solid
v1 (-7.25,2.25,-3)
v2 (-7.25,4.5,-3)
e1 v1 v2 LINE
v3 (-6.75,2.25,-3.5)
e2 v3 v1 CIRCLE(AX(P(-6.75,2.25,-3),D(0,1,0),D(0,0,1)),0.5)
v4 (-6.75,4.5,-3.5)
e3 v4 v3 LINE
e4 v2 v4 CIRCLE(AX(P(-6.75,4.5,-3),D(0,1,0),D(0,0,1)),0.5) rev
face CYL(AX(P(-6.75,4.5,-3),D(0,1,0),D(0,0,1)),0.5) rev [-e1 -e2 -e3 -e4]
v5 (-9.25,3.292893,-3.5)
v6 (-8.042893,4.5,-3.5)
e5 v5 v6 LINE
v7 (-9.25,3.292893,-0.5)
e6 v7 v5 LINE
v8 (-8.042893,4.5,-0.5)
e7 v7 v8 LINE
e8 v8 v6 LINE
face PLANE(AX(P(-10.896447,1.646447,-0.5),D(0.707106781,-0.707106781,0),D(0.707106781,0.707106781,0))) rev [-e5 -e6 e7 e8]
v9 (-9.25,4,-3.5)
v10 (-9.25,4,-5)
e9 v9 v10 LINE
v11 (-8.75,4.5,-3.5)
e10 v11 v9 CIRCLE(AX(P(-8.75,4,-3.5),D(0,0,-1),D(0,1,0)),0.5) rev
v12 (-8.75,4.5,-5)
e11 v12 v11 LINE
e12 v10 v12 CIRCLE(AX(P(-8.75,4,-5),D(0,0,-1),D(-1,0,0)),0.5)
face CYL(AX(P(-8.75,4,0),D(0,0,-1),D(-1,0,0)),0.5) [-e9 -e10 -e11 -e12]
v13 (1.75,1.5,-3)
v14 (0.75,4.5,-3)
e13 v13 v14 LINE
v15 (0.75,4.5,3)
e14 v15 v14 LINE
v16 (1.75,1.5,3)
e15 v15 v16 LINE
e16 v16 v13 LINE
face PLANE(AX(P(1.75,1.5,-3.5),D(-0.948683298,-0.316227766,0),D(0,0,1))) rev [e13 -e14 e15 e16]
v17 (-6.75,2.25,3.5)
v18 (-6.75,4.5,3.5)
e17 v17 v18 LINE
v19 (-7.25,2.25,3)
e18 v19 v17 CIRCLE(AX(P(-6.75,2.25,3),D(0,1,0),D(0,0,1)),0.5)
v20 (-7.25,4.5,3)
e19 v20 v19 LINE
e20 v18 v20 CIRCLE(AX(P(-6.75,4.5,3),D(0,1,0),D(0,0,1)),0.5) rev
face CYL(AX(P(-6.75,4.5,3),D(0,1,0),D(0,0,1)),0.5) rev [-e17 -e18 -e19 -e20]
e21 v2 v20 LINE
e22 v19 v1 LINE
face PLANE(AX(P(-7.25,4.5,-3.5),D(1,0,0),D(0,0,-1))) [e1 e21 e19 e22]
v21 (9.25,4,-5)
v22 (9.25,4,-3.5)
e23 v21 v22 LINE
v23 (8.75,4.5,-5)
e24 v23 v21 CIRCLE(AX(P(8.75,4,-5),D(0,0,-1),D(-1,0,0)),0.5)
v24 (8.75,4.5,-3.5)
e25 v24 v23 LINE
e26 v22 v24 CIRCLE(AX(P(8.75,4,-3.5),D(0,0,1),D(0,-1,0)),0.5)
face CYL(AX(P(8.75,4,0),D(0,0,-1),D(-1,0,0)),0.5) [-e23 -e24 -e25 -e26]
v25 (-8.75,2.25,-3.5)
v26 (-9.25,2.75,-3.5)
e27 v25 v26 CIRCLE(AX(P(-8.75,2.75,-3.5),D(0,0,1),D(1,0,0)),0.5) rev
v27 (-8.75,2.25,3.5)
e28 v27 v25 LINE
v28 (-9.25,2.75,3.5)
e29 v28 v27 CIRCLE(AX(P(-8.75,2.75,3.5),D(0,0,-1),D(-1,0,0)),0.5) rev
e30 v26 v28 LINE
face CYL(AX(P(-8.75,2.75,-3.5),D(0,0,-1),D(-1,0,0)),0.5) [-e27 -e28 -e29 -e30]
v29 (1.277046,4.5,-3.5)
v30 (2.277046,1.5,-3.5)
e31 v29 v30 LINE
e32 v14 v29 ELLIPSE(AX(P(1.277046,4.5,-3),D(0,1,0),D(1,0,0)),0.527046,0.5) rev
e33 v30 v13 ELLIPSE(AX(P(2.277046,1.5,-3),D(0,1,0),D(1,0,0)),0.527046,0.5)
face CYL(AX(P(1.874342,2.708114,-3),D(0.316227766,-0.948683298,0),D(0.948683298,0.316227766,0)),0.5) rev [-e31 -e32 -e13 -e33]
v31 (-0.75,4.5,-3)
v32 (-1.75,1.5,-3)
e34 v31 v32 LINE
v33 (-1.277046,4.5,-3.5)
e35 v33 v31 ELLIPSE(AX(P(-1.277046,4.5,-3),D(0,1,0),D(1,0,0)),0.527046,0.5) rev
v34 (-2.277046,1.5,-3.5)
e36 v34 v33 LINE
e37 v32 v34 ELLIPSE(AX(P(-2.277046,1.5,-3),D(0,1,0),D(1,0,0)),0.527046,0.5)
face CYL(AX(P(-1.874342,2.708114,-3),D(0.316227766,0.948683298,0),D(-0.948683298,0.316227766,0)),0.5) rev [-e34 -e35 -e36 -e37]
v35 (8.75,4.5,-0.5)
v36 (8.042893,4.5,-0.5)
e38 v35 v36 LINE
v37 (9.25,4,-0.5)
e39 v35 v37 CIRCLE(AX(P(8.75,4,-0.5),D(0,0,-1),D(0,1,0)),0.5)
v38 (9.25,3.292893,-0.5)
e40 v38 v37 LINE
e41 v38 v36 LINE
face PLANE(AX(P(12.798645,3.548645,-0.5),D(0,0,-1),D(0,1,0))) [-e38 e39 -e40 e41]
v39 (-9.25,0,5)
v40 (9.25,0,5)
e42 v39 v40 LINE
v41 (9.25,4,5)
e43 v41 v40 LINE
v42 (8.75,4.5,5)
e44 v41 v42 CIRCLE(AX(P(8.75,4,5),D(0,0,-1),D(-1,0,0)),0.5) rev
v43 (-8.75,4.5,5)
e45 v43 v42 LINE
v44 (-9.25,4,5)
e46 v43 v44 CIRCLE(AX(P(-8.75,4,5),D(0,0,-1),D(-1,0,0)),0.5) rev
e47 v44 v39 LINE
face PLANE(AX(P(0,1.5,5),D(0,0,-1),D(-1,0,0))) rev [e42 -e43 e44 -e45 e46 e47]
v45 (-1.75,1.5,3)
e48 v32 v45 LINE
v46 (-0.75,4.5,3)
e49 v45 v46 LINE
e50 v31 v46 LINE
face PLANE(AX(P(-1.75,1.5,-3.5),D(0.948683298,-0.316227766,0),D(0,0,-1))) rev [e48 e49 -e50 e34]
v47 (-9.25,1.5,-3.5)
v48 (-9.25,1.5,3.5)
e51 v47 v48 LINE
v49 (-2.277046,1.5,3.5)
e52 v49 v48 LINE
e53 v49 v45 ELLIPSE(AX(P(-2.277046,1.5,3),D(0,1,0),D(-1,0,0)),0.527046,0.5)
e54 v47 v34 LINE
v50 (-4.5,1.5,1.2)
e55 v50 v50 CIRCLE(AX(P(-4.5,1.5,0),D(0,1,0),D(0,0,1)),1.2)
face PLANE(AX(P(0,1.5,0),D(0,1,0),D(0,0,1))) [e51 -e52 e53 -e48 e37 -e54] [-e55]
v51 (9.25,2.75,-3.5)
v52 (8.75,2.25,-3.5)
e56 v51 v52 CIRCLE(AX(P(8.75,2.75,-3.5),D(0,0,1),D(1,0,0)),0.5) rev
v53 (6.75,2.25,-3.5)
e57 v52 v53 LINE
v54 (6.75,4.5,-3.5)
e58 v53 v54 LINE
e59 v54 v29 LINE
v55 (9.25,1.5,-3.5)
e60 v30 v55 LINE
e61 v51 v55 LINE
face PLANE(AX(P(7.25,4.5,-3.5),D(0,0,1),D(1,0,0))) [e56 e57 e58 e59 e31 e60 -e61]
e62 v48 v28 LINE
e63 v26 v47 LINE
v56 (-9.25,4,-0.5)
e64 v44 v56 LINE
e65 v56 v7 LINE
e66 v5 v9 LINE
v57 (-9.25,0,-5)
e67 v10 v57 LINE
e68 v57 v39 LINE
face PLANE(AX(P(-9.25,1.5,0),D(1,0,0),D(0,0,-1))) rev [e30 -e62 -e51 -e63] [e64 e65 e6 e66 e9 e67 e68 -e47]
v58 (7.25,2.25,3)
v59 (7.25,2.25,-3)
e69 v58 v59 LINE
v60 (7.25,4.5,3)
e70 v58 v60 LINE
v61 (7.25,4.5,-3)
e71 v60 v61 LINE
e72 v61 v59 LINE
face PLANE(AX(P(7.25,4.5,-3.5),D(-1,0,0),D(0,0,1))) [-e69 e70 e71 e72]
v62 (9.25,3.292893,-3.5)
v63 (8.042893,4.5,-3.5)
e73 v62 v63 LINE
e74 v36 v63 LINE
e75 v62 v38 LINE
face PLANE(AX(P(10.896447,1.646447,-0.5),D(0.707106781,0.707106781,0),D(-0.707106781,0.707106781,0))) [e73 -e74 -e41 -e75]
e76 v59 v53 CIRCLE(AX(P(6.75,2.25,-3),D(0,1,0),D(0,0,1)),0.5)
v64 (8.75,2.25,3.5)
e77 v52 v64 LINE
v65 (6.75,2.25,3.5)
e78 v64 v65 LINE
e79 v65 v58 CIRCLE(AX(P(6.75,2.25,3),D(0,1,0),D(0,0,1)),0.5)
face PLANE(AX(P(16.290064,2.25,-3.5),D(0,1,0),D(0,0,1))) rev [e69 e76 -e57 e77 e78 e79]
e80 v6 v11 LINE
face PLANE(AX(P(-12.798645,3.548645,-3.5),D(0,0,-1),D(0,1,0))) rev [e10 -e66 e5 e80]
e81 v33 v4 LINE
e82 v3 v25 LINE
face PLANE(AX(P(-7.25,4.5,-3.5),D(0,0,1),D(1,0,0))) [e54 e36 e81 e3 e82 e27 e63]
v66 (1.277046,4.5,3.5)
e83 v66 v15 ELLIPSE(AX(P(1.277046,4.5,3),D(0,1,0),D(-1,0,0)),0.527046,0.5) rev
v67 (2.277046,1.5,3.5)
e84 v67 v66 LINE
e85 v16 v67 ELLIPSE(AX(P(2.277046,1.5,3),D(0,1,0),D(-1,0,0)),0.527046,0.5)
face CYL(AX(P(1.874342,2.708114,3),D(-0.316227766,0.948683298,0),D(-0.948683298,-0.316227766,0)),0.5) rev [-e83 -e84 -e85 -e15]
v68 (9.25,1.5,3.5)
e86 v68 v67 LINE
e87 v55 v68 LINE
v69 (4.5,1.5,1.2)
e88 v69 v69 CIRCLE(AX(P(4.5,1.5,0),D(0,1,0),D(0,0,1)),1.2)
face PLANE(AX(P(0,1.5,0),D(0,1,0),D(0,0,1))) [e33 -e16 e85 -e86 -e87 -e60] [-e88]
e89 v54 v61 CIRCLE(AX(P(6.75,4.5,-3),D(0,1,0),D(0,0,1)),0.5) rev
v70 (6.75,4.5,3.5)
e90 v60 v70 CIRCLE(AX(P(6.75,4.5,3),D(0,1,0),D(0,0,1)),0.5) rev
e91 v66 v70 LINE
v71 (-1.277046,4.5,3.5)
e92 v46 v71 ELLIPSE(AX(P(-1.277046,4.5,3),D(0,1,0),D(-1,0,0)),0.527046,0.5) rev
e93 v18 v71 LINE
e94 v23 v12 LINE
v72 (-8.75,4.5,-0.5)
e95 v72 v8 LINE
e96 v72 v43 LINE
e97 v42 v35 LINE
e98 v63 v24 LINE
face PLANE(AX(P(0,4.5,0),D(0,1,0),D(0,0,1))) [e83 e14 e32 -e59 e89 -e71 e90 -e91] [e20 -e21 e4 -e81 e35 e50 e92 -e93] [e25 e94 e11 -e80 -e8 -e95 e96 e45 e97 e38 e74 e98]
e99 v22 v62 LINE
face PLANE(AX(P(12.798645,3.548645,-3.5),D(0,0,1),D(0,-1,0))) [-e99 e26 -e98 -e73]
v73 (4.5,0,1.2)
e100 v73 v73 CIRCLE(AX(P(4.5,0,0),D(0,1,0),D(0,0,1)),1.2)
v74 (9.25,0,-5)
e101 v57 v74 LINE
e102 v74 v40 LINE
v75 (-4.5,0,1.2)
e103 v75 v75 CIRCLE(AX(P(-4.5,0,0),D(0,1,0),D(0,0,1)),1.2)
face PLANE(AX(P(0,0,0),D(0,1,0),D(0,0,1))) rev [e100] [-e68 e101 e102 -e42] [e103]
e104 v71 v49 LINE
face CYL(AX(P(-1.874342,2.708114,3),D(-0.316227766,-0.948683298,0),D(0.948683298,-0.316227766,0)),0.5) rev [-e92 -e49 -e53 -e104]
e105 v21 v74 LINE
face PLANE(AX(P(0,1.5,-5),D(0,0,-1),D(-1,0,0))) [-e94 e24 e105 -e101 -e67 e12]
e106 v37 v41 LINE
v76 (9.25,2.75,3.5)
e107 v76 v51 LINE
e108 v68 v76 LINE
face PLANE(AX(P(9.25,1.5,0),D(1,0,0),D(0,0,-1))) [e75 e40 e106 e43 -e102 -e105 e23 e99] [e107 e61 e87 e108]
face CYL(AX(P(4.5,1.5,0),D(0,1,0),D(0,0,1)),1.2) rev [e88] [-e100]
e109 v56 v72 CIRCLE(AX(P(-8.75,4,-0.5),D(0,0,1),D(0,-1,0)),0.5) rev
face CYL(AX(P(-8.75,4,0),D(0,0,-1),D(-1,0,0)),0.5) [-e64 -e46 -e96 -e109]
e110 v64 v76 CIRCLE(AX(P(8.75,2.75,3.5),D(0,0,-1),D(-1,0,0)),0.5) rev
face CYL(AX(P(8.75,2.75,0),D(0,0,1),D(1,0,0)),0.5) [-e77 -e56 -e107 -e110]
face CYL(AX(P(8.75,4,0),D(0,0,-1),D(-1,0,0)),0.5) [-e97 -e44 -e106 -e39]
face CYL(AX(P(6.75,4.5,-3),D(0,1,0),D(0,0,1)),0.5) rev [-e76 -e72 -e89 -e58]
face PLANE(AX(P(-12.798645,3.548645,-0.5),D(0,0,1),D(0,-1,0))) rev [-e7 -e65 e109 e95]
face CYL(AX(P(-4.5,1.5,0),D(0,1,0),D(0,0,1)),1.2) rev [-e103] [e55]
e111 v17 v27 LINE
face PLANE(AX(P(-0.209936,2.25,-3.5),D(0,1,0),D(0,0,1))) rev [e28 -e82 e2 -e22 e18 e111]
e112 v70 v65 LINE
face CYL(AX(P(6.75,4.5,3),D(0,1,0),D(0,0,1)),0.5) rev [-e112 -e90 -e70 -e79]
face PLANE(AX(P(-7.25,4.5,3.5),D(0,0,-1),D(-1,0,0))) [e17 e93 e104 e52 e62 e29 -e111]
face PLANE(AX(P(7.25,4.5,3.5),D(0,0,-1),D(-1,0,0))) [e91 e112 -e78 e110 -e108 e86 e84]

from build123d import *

# Parameters (mm, degrees)
SKETCH1_W           = 18.5
SKETCH1_H           = 10
SKETCH1_W_2         = 5.5
SKETCH1_H_2         = 7
BOSS_EXTRUDE1_DEPTH = 1.5
SKETCH1_3_W         = 18.5
SKETCH1_3_H         = 10
SKETCH1_3_W_2       = 5.5
SKETCH1_3_H_2       = 7
BOSS_EXTRUDE2_DEPTH = 4.5
CUT_EXTRUDE1_START  = -2
SKETCH2_W           = 7
SKETCH2_H           = 0.75
CUT_EXTRUDE1_DEPTH  = 2
CUT_EXTRUDE5_START  = -16.5
SKETCH2_2_W         = 7
SKETCH2_2_H         = 0.75
CUT_EXTRUDE5_DEPTH  = 2
SKETCH4_W           = 3
SKETCH4_H           = 2.690114405
CUT_EXTRUDE3_DEPTH  = 12.437329234
CHAMFER1_SIZE       = 1
CHAMFER1_SIZE_2     = 3
FILLET2_R           = 0.5


with BuildPart() as part:
    # Sketch1 → Boss-Extrude1 (new body)
    # profile 1 of 3: a face of its own
    with BuildSketch(Plane(origin=(0, 0, 0), x_dir=(1, 0, 0), z_dir=(0, 1, 0))):
        Rectangle(SKETCH1_W, SKETCH1_H)
        with Locations((4.5, 0)):
            Rectangle(SKETCH1_W_2, SKETCH1_H_2, mode=Mode.SUBTRACT)
        with Locations((-4.5, 0)):
            Rectangle(SKETCH1_W_2, SKETCH1_H_2, mode=Mode.SUBTRACT)
    # profile 2 of 3: a face of its own
    with BuildSketch(Plane(origin=(0, 0, 0), x_dir=(1, 0, 0), z_dir=(0, 1, 0))):
        with Locations((4.5, 0)):
            Rectangle(SKETCH1_W_2, SKETCH1_H_2)
    # profile 3 of 3: a face of its own
    with BuildSketch(Plane(origin=(0, 0, 0), x_dir=(1, 0, 0), z_dir=(0, 1, 0))):
        with Locations((-4.5, 0)):
            Rectangle(SKETCH1_W_2, SKETCH1_H_2)
    extrude(amount=BOSS_EXTRUDE1_DEPTH)

    # Sketch1<3> → Boss-Extrude2 (add)
    with BuildSketch(Plane(origin=(0, 0, 0), x_dir=(1, 0, 0), z_dir=(0, 1, 0))):
        Rectangle(SKETCH1_3_W, SKETCH1_3_H)
        with Locations((-4.5, 0)):
            Rectangle(SKETCH1_3_W_2, SKETCH1_3_H_2, mode=Mode.SUBTRACT)
        with Locations((4.5, 0)):
            Rectangle(SKETCH1_3_W_2, SKETCH1_3_H_2, mode=Mode.SUBTRACT)
    extrude(amount=BOSS_EXTRUDE2_DEPTH)

    # Sketch2 → Cut-Extrude1 (cut)
    with BuildSketch(Plane.ZY.offset(9.25).offset(CUT_EXTRUDE1_START)):
        with Locations((0, 1.875)):
            Rectangle(SKETCH2_W, SKETCH2_H)
    extrude(amount=CUT_EXTRUDE1_DEPTH, mode=Mode.SUBTRACT)

    # Sketch2<2> → Cut-Extrude5 (cut)
    with BuildSketch(Plane.ZY.offset(9.25).offset(CUT_EXTRUDE5_START)):
        with Locations((0, 1.875)):
            Rectangle(SKETCH2_2_W, SKETCH2_2_H)
    extrude(amount=-CUT_EXTRUDE5_DEPTH, mode=Mode.SUBTRACT)

    # Sketch4 → Cut-Extrude3 (cut, symmetric)
    with BuildSketch(Plane(origin=(0, 0, 0), x_dir=(0, 0, 1), z_dir=(0.7071067811865488, 0.7071067811865464, 0))):
        with Locations((-2, -10.214222054)):
            Rectangle(SKETCH4_W, SKETCH4_H)
    cut_extrude3 = extrude(amount=CUT_EXTRUDE3_DEPTH, both=True, mode=Mode.SUBTRACT)

    # Sketch5 → M2 Clearance Hole1 (revolve, cut)
    with BuildSketch(Plane(origin=(-4.5, 1.5, 0), x_dir=(0, 0, 1), z_dir=(1, 0, 0))):
        Polygon((0, 0), (0, 2.321032743), (1.2, 1.6), (1.2, 0), align=None)
    m2_clearance_hole1 = revolve(axis=Axis((-4.5, 7.85, 0), (0, -1, 0)), mode=Mode.SUBTRACT)

    # Mirror4: Cut-Extrude3, M2 Clearance Hole1 across plane
    add(cut_extrude3.mirror(Plane(origin=(0, 0, 0), x_dir=(0, 0, 1), z_dir=(1, 0, 0))), mode=Mode.SUBTRACT)
    add(m2_clearance_hole1.mirror(Plane(origin=(0, 0, 0), x_dir=(0, 0, 1), z_dir=(1, 0, 0))), mode=Mode.SUBTRACT)

    # Chamfer1
    # the kernel refuses this chamfer: 3, 1 mm, written as the material it takes off along each edge
    with BuildSketch(Plane(origin=(-1.75, 4.5, -3.5), x_dir=(0.9940388851139268, 0.10902612017980688, 0), z_dir=(0, 0, 1)), Plane(origin=(1.75, 4.5, 3.5), x_dir=(-0.9940388851139268, 0.10902612017980688, 0), z_dir=(0, 0, -1))) as chamfer1_piece_1:
        Polygon((CHAMFER1_SIZE * 0.994038885114, -CHAMFER1_SIZE * 0.10902612018), (-CHAMFER1_SIZE_2 * 0.10902612018, -CHAMFER1_SIZE_2 * 0.994038885114), (0, 0), align=None)
    extrude(amount=7, mode=Mode.SUBTRACT)

    # Fillet2
    fillet2_edges = [part.edges().sort_by_distance(p)[0] for p in [
        (9.25, 4.5, -4.25),
        (1.25, 3, 3.5),
        (1.25, 3, -3.5),
        (-1.25, 3, -3.5),
        (-1.25, 3, 3.5),
        (-9.25, 4.5, -4.25),
        (9.25, 4.5, 2.25),
        (-7.25, 3.375, 3.5),
        (-7.25, 3.375, -3.5),
        (7.25, 3.375, 3.5),
        (7.25, 3.375, -3.5),
        (-9.25, 2.25, 0),
        (9.25, 2.25, 0),
        (-9.25, 4.5, 2.25),
    ]]
    fillet(fillet2_edges, radius=FILLET2_R)


solid = part.part
